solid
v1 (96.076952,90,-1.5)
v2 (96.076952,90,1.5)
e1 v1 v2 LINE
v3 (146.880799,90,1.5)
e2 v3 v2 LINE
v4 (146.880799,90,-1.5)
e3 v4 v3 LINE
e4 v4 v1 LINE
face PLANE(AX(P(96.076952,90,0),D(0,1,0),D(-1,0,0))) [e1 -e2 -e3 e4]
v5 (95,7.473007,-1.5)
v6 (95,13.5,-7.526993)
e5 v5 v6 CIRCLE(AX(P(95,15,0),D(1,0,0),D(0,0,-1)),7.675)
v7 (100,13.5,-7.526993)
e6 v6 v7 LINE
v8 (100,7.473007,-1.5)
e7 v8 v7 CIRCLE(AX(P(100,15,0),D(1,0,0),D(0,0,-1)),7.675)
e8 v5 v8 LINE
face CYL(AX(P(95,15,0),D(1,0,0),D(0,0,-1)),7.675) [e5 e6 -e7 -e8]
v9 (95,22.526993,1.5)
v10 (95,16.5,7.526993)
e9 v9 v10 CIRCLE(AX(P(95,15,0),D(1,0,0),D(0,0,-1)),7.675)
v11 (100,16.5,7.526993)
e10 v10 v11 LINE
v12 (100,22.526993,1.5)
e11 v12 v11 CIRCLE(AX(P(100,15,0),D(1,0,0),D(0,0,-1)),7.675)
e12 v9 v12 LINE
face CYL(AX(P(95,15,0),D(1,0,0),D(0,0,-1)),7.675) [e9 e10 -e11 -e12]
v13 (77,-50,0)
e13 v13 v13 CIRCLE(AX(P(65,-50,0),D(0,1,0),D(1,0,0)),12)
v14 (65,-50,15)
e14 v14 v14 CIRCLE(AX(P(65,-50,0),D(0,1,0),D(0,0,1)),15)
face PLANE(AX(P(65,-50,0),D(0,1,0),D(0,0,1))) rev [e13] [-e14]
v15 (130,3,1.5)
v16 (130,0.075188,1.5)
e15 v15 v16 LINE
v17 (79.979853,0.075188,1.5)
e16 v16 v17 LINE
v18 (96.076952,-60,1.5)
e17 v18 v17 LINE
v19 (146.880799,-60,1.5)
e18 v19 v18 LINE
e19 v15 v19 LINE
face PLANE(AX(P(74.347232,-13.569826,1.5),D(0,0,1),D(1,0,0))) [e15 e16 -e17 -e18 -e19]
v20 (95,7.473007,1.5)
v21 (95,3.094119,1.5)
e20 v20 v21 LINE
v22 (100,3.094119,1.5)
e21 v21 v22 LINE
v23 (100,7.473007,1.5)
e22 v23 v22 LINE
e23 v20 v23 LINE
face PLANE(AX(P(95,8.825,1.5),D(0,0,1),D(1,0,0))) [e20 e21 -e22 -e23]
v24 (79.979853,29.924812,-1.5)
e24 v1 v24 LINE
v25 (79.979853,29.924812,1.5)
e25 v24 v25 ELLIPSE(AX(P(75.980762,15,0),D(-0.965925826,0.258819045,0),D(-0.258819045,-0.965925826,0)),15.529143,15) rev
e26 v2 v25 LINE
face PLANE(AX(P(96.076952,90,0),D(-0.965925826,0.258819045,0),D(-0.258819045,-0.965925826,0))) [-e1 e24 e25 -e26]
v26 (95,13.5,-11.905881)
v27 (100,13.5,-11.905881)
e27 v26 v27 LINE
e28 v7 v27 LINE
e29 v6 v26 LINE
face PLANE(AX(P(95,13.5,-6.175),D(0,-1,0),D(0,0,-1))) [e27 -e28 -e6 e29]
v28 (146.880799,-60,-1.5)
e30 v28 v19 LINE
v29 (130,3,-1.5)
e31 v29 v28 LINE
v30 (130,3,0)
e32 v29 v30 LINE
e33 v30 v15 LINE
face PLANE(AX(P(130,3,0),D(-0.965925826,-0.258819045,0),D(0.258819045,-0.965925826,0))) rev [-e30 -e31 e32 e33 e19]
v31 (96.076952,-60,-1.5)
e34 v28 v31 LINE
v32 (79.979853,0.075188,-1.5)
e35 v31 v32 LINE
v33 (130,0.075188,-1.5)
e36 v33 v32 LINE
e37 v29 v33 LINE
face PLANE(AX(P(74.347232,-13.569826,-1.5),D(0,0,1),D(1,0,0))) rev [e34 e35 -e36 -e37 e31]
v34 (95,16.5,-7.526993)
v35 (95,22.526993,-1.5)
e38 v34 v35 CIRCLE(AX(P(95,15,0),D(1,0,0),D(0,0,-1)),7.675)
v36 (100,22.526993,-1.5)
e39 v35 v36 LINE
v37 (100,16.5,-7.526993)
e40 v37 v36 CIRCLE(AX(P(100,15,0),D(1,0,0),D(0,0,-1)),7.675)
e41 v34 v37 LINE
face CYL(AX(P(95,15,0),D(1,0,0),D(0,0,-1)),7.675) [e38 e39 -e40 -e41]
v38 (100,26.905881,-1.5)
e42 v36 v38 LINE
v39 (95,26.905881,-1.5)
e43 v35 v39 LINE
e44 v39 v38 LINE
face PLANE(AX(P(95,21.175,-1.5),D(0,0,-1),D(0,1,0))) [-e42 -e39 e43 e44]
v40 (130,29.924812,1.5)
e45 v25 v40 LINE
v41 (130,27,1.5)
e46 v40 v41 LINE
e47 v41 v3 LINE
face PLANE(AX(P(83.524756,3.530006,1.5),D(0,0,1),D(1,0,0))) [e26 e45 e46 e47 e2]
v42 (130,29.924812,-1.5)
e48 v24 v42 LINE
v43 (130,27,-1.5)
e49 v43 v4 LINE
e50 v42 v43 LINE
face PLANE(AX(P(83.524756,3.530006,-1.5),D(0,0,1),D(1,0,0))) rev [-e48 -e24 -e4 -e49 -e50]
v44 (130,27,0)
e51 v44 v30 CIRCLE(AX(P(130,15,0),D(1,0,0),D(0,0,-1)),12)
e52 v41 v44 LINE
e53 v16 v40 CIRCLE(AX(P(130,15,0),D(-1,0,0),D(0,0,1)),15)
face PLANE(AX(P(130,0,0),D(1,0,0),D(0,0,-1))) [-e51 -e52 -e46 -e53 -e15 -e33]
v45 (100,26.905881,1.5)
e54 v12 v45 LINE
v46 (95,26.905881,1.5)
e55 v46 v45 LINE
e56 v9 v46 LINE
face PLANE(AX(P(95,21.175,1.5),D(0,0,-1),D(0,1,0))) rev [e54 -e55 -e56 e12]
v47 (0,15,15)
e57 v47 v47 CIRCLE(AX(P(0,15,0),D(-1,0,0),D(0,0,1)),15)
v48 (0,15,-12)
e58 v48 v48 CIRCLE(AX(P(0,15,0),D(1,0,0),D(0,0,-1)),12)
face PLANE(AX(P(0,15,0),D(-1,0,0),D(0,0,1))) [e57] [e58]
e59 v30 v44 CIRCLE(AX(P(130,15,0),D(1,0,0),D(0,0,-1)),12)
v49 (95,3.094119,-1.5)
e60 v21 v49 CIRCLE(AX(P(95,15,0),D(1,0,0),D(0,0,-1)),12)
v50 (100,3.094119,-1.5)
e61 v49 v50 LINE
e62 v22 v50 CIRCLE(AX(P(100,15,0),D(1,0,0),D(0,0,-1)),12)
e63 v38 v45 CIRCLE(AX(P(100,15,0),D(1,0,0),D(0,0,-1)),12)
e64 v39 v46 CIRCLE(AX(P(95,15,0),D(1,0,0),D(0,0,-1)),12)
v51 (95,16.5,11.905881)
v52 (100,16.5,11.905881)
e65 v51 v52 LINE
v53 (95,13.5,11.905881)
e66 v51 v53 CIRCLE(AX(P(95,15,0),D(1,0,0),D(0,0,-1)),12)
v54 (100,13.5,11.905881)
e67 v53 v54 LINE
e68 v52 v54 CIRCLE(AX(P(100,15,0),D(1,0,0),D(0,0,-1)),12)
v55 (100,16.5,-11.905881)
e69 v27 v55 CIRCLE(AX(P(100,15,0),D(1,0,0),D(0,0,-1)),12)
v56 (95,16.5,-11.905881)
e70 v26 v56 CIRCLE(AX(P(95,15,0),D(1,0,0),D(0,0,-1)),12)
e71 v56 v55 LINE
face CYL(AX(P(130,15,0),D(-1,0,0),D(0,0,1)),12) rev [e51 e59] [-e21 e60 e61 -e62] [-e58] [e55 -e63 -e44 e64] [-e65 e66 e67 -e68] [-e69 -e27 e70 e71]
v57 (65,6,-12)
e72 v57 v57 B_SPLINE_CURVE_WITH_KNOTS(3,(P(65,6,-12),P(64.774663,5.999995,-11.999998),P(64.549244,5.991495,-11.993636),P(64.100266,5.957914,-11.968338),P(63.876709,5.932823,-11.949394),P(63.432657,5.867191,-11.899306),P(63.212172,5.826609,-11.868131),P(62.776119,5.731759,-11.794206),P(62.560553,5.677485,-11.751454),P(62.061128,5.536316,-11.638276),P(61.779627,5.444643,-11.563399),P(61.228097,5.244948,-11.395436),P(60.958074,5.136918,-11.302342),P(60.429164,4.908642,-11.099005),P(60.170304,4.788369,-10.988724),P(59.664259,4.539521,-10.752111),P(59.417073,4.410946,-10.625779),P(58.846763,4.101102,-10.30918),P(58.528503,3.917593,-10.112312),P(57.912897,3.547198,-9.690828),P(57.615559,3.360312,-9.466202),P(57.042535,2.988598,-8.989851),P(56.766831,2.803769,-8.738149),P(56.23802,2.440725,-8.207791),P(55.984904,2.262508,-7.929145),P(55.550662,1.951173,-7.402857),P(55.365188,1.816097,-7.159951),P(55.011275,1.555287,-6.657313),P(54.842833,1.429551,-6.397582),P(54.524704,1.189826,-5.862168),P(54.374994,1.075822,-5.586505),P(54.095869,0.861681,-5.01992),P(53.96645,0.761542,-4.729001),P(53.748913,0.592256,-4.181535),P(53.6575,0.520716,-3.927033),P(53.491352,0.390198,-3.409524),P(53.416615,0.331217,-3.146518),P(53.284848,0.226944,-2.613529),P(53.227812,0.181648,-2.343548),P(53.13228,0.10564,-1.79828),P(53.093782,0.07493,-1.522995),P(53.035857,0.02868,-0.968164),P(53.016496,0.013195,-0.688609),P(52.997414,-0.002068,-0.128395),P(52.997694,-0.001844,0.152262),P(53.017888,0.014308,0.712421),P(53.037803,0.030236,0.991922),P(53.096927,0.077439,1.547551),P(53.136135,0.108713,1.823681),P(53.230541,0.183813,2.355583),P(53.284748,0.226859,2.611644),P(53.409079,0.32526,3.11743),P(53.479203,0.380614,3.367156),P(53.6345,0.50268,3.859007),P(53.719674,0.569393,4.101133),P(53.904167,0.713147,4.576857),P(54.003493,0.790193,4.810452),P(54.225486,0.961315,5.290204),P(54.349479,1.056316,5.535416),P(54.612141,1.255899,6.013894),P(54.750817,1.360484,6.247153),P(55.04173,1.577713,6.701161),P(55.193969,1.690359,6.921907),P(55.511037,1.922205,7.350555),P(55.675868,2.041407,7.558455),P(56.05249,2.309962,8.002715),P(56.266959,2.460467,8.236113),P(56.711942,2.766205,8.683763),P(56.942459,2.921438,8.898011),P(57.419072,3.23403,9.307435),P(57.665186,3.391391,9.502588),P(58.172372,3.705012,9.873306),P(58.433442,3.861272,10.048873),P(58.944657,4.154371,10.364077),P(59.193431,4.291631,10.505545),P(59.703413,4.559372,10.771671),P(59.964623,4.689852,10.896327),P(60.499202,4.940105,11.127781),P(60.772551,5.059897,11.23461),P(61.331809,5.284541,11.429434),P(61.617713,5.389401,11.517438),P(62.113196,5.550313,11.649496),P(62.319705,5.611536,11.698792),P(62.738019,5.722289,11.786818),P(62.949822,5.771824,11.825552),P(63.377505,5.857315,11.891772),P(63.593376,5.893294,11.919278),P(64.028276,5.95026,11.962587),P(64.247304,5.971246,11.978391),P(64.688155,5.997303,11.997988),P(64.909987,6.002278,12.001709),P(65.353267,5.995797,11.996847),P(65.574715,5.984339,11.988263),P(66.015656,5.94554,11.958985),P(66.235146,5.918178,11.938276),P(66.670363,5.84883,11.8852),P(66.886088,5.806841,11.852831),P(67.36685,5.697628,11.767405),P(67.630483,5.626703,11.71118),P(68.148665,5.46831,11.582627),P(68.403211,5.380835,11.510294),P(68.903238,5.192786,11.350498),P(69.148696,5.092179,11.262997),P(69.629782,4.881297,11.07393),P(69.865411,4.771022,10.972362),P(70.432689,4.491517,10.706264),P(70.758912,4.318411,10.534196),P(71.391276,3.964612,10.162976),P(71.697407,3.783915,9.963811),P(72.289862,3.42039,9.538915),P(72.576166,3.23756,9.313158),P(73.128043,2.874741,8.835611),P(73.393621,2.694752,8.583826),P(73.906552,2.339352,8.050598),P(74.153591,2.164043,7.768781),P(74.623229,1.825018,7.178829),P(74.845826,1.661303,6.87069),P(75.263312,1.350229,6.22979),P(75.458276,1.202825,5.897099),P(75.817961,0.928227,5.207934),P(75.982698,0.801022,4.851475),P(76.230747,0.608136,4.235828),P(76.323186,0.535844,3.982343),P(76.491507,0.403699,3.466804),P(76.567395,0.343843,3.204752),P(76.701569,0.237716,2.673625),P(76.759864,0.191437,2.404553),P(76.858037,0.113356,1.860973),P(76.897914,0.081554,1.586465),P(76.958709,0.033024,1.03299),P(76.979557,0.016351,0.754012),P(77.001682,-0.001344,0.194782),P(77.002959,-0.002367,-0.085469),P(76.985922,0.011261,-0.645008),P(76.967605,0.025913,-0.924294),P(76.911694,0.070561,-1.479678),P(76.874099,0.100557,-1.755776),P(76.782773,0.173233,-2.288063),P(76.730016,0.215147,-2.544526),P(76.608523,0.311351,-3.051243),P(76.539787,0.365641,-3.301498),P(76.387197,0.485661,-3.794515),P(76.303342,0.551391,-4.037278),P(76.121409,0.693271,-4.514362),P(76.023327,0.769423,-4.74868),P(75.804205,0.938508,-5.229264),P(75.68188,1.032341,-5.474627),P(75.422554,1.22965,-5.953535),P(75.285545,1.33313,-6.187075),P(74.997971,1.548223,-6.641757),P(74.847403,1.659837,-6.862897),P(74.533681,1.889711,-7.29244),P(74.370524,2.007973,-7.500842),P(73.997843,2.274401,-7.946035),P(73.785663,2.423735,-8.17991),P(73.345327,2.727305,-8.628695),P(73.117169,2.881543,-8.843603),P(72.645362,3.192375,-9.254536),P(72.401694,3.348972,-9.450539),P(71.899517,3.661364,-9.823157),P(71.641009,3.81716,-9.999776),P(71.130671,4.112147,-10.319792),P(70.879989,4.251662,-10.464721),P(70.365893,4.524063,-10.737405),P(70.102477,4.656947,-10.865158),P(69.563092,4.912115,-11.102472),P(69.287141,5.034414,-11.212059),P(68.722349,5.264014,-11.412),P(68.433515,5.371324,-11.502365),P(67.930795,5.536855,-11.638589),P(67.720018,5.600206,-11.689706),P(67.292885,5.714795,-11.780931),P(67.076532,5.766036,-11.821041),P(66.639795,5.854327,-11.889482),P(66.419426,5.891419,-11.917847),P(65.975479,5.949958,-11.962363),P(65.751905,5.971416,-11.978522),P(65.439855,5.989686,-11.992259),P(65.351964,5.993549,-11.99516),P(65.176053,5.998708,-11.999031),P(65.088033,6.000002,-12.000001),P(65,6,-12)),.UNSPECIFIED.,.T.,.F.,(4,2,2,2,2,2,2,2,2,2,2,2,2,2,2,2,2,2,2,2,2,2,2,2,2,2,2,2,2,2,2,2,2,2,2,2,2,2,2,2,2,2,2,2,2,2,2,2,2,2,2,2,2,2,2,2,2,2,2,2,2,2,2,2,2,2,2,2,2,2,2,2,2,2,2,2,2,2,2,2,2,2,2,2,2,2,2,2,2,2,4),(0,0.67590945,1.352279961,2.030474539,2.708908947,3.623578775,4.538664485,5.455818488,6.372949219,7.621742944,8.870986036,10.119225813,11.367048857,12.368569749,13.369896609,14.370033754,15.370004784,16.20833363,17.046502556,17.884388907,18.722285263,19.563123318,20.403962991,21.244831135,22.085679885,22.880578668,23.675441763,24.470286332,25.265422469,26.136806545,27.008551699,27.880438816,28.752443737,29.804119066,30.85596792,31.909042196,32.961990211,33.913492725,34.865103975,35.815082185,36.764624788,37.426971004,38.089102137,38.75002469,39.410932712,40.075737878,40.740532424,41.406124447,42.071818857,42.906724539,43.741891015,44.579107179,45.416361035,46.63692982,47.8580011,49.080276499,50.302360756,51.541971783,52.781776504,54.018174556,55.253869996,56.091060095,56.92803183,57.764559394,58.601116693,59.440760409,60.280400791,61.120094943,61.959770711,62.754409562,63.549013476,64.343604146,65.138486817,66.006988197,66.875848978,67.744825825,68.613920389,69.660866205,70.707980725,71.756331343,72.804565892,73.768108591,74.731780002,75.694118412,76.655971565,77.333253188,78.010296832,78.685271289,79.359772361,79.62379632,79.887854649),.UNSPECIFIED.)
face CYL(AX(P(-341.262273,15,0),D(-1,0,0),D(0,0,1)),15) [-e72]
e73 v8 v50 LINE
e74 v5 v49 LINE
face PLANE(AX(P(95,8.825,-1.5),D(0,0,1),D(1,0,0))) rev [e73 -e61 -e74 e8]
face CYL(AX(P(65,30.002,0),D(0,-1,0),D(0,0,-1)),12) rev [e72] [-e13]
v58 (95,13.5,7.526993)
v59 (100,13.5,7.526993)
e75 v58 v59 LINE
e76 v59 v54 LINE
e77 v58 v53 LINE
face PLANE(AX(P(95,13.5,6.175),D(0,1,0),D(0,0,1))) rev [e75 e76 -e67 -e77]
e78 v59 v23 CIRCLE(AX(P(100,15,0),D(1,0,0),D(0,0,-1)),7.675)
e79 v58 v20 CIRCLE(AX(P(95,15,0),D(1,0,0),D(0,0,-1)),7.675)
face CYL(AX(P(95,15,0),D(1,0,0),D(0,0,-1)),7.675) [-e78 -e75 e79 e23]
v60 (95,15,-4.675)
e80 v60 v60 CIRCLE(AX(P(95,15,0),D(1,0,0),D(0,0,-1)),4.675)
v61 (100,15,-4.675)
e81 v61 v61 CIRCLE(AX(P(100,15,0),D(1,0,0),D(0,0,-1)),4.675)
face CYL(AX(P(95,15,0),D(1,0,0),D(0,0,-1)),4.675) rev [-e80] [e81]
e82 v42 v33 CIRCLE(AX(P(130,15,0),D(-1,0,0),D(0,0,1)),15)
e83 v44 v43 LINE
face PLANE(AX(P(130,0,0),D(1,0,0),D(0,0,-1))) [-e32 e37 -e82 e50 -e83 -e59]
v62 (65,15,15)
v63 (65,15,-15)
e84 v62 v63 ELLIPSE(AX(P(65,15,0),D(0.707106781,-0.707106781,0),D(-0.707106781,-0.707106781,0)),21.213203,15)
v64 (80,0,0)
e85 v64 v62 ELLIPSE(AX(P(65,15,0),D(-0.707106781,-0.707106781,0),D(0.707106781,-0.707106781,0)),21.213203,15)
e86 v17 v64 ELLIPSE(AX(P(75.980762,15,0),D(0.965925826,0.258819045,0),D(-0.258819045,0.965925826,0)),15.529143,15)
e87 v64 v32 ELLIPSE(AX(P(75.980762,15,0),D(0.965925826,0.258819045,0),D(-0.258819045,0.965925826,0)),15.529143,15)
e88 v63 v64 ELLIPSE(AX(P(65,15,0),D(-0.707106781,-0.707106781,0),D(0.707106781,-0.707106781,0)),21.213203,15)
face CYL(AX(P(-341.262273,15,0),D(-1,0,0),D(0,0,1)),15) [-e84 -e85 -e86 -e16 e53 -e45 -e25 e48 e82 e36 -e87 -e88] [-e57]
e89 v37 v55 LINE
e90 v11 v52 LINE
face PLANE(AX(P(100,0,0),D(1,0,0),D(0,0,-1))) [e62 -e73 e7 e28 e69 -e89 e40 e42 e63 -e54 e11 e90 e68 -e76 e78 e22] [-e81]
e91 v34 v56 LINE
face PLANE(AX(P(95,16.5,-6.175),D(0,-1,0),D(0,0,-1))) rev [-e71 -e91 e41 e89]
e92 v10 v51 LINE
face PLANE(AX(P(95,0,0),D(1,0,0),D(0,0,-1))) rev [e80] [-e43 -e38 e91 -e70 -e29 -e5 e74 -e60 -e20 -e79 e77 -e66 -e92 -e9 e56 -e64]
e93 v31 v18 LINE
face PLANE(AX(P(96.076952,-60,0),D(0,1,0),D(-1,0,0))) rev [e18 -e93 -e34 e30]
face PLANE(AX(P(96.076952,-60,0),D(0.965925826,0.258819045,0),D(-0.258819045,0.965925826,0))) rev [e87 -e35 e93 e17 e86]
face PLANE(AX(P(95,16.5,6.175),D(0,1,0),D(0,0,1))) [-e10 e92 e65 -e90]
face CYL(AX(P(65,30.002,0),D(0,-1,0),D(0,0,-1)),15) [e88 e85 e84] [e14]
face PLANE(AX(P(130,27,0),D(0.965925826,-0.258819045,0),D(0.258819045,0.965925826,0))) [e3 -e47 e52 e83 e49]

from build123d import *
from build123d.topology import SkipClean

# Parameters (mm, degrees)
SKETCH1_W                = 130
SKETCH1_H                = 15
SKETCH2_R                = 12
CUT_EXTRUDE1_DEPTH       = 135.257215821
EXTRUDE_THIN3_REACH      = 155.379
EXTRUDE_THIN3_END_RADIUS = 15
SKETCH3_R                = 15
SKETCH3_R_2              = 12
RIB3_START               = -1.5
RIB3_DEPTH               = 3
SKETCH6_R                = 7.675
SKETCH6_R_2              = 4.675
SKETCH6_W                = 3
SKETCH6_H                = 5.825
SKETCH6_W_2              = 5.825
SKETCH6_H_2              = 3
EXTRUDE_THIN4_DEPTH      = 5


with BuildPart() as part:
    # Sketch1 → Revolve2 (revolve)
    with BuildSketch(Plane.XY, mode=Mode.PRIVATE) as revolve2_sk:
        with Locations((65, 7.5)):
            Rectangle(SKETCH1_W, SKETCH1_H)
    revolve(revolve2_sk.sketch.rotate(Axis((-341.262273345, 15, 0), (1, 0, 0)), 270), axis=Axis((-341.262273345, 15, 0), (1, 0, 0)))

    # Sketch2 → Cut-Extrude1 (cut, through all)
    with BuildSketch(Plane(origin=(0, 0, 0), x_dir=(0, 0, -1), z_dir=(1, 0, 0))):
        with Locations((0, 15)):
            Circle(SKETCH2_R)
    extrude(amount=CUT_EXTRUDE1_DEPTH, mode=Mode.SUBTRACT)

    # Extrude-Thin3: up to this cylinder (the profile starts outside it)
    extrude_thin3_end = Plane(origin=(50.424264, 15, 0), z_dir=(-1, 0, 0)) * Cylinder(EXTRUDE_THIN3_END_RADIUS, 341.758, mode=Mode.PRIVATE)
    # Sketch3 → Extrude-Thin3 (add, up to the surface)
    with BuildSketch(Plane(origin=(0, -50, 0), x_dir=(1, 0, 0), z_dir=(0, 1, 0)), mode=Mode.PRIVATE) as extrude_thin3_sk1:
        with Locations((65, 0)):
            Circle(SKETCH3_R)
        with Locations((65, 0)):
            Circle(SKETCH3_R_2, mode=Mode.SUBTRACT)
    extrude_thin3_tool1 = extrude(extrude_thin3_sk1.sketch, amount=EXTRUDE_THIN3_REACH, mode=Mode.PRIVATE) - extrude_thin3_end
    add(extrude_thin3_tool1.solids().sort_by_distance((50.424264, -50, 0))[0])

    # Rib3: read off the stored shape, not the designer's step
    # Rib3 outline → Rib3 (add)
    with SkipClean():  # the faces are left unmerged after this step: merging them gives an invalid solid
        with BuildSketch(Plane.XY.offset(RIB3_START)):
            Polygon((146.880799123, -60), (130, 3), (130, 0.075188443), (79.979853317, 0.075188443), (96.076951546, -60), align=None)
        rib3 = extrude(amount=RIB3_DEPTH)

    # Mirror1: Rib3 across plane
    add(rib3.mirror(Plane.ZX.offset(15)))

    # Sketch6 → Extrude-Thin4 (add)
    # profile 1 of 5: a face of its own
    with BuildSketch(Plane(origin=(100, 0, 0), x_dir=(0, 0, -1), z_dir=(1, 0, 0))):
        with Locations((0, 15)):
            Circle(SKETCH6_R)
        with Locations((0, 15)):
            Circle(SKETCH6_R_2, mode=Mode.SUBTRACT)
    # profile 2 of 5: a face of its own
    with BuildSketch(Plane(origin=(100, 0, 0), x_dir=(0, 0, -1), z_dir=(1, 0, 0))):
        with Locations((0, 24.0875)):
            Rectangle(SKETCH6_W, SKETCH6_H)
    # profile 3 of 5: a face of its own
    with BuildSketch(Plane(origin=(100, 0, 0), x_dir=(0, 0, -1), z_dir=(1, 0, 0))):
        with Locations((9.0875, 15)):
            Rectangle(SKETCH6_W_2, SKETCH6_H_2)
    # profile 4 of 5: a face of its own
    with BuildSketch(Plane(origin=(100, 0, 0), x_dir=(0, 0, -1), z_dir=(1, 0, 0))):
        with Locations((-9.0875, 15)):
            Rectangle(SKETCH6_W_2, SKETCH6_H_2)
    # profile 5 of 5: a face of its own
    with BuildSketch(Plane(origin=(100, 0, 0), x_dir=(0, 0, -1), z_dir=(1, 0, 0))):
        with Locations((0, 5.9125)):
            Rectangle(SKETCH6_W, SKETCH6_H)
    extrude(amount=-EXTRUDE_THIN4_DEPTH)


solid = part.part
